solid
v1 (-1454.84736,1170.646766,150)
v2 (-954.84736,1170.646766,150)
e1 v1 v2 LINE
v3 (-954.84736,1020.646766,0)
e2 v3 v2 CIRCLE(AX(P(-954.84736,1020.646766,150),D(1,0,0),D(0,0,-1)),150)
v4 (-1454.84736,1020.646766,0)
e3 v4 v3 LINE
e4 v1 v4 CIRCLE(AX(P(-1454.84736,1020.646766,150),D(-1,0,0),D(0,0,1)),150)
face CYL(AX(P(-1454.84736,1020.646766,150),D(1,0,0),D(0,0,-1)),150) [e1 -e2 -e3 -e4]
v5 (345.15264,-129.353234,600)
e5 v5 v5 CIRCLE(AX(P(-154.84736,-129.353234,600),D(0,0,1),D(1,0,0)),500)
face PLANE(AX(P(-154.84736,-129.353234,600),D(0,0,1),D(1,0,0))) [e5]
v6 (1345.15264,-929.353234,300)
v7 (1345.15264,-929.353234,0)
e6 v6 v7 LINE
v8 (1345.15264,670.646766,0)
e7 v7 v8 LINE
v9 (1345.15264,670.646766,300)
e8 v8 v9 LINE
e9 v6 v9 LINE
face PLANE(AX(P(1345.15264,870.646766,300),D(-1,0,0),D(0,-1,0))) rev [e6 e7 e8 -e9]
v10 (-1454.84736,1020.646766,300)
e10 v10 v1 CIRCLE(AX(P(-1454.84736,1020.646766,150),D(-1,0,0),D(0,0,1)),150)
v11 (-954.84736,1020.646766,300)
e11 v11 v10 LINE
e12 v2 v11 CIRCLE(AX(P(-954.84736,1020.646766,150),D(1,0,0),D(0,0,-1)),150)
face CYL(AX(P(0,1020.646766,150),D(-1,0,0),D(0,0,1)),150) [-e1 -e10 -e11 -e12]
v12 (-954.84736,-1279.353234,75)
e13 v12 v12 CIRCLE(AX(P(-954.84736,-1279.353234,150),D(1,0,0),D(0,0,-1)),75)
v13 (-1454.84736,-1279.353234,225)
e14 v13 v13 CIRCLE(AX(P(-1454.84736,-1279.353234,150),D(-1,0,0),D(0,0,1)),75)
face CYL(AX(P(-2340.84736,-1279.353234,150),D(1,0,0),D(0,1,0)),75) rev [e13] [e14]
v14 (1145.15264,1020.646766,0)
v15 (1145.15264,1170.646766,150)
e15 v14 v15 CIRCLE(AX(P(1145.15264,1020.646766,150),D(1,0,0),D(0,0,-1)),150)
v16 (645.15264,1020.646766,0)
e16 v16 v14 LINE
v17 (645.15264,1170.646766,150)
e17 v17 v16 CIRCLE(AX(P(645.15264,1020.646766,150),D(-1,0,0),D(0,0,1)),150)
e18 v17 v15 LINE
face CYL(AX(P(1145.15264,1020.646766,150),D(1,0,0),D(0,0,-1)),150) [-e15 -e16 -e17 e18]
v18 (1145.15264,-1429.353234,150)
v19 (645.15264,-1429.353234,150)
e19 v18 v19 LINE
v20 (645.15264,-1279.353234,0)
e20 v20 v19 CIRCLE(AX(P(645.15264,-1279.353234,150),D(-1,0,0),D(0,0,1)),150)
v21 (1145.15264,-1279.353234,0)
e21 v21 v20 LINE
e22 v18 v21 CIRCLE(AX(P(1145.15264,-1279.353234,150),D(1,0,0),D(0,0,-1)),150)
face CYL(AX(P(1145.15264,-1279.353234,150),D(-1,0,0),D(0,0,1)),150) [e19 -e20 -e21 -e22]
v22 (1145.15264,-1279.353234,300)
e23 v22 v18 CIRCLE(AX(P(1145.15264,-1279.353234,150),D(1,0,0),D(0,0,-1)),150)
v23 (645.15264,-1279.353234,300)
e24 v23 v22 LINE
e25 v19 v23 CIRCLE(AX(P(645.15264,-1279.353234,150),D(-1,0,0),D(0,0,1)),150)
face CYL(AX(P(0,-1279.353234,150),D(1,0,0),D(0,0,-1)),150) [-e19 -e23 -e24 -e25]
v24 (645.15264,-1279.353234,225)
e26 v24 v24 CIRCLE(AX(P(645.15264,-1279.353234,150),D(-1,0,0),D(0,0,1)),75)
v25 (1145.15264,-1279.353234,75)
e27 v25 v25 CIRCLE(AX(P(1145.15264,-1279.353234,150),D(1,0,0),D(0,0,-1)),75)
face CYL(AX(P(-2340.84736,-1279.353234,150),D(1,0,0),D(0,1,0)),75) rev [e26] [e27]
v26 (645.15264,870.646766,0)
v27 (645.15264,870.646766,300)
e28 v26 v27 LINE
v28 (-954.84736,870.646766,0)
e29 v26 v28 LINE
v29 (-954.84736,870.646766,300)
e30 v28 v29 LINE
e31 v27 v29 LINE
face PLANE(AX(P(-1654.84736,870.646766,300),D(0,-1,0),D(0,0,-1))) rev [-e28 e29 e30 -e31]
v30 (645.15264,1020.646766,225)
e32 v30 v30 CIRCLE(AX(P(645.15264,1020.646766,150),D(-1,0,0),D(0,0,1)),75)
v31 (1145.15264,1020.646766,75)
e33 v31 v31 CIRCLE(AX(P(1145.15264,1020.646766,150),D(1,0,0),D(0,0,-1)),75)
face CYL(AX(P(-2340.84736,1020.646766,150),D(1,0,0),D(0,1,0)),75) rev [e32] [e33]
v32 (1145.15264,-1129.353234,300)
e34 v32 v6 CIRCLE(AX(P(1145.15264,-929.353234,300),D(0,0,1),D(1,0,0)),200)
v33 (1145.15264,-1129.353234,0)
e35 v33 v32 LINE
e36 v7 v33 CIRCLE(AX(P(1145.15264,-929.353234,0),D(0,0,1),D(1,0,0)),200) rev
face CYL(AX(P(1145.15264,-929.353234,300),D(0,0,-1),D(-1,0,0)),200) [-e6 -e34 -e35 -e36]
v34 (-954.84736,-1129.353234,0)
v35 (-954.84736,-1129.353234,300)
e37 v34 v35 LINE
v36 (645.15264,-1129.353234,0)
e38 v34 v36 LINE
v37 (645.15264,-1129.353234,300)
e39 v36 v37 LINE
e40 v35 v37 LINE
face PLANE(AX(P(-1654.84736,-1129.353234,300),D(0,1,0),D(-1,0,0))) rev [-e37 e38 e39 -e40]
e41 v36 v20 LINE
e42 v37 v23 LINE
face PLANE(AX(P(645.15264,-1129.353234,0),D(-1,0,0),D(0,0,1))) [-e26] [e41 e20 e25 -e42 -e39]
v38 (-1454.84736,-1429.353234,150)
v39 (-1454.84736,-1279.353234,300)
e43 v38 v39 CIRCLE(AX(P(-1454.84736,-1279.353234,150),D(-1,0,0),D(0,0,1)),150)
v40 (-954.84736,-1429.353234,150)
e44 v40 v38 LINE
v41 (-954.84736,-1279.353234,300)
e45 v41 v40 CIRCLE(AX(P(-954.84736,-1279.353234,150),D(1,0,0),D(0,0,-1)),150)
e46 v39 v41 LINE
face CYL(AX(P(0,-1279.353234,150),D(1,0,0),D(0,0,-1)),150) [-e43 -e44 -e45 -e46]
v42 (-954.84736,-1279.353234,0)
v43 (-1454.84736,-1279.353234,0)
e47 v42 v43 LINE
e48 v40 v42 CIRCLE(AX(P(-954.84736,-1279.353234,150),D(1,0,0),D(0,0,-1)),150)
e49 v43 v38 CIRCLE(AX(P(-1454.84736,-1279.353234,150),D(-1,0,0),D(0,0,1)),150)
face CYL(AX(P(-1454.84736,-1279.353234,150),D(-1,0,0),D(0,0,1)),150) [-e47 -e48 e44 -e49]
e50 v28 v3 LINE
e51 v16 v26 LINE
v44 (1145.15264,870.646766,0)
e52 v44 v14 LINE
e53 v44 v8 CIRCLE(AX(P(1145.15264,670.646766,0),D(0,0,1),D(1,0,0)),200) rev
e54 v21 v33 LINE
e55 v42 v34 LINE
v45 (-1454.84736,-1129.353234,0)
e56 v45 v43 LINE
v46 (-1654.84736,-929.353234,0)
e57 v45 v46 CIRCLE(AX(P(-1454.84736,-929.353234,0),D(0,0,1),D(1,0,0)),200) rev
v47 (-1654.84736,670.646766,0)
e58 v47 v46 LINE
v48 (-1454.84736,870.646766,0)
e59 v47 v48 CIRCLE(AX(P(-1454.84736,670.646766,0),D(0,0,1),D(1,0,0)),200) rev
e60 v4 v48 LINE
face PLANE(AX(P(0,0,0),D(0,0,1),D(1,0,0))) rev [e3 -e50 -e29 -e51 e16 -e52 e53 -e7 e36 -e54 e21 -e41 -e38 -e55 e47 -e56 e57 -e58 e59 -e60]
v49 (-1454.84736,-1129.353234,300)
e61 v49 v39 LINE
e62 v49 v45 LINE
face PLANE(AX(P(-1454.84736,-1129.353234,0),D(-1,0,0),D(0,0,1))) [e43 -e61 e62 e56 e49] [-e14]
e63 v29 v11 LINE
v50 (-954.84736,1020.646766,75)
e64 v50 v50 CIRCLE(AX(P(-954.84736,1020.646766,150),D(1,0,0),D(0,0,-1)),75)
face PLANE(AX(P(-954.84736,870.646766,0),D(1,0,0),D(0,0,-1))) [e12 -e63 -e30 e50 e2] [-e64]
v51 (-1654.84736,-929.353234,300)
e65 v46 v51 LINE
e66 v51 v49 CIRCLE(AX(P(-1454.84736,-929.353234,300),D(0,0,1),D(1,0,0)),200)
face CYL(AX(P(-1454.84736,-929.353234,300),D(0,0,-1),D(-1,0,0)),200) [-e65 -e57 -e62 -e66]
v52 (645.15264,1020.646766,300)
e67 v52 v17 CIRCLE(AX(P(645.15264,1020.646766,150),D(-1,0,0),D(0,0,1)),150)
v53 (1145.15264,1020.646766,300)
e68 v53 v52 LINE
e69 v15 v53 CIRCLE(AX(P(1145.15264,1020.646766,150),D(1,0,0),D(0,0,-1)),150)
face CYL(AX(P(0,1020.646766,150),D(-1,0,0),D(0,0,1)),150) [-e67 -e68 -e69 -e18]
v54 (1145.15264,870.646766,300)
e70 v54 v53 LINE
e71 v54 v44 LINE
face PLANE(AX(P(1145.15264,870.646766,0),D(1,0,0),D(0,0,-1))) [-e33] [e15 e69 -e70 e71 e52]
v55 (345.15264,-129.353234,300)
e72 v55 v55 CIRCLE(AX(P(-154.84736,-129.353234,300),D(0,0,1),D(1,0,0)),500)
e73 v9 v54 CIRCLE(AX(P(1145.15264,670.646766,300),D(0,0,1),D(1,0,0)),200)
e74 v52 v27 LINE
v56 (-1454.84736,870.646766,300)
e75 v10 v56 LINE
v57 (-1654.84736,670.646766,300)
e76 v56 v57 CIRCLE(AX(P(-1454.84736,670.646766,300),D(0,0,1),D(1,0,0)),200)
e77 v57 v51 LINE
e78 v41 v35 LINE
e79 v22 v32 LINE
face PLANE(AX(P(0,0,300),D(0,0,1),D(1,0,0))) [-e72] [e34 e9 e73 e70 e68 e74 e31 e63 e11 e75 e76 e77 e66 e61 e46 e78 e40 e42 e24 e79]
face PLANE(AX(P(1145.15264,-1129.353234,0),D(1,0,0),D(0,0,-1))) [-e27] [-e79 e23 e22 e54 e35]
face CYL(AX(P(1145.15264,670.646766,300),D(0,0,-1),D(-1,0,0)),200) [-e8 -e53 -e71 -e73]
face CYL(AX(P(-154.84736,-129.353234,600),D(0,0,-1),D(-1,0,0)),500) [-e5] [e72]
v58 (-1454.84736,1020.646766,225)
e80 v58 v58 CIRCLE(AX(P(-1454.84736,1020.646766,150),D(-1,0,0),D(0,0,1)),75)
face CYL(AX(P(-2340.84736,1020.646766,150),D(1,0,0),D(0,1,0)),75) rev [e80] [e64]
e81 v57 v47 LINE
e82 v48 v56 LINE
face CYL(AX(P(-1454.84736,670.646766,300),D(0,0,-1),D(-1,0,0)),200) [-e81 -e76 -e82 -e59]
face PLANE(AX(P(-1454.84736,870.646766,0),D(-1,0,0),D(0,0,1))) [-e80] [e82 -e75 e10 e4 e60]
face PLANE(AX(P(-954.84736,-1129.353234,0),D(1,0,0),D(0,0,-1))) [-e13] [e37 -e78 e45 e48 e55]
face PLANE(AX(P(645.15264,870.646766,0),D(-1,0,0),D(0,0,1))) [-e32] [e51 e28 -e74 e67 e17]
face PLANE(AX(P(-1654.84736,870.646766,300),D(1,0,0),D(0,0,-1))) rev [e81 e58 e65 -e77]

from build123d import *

# Parameters (mm, degrees)
IZIM1_W                     = 3000
IZIM1_H                     = 2000
Y_KSEKLIK_EKSTR_ZYON1_DEPTH = 300
RADYUS1_R                   = 200
IZIM2_W                     = 500
IZIM2_H                     = 300
Y_KSEKLIK_EKSTR_ZYON2_DEPTH = 300
IZIM3_R                     = 75
KES_EKSTR_ZYON1_DEPTH       = 3686
RADYUS2_R                   = 150
IZIM4_R                     = 500
Y_KSEKLIK_EKSTR_ZYON3_DEPTH = 300


with BuildPart() as part:
    # Çizim1 → Yükseklik-Ekstrüzyon1 (new body)
    with BuildSketch(Plane.XY):
        with Locations((-154.847360295, -129.353233831)):
            Rectangle(IZIM1_W, IZIM1_H)
    extrude(amount=Y_KSEKLIK_EKSTR_ZYON1_DEPTH)

    # Radyus1
    radyus1_edges = [part.edges().sort_by_distance(p)[0] for p in [
        (-1654.847360295, 870.646766169, 150),
        (1345.152639705, 870.646766169, 150),
        (1345.152639705, -1129.353233831, 150),
        (-1654.847360295, -1129.353233831, 150),
    ]]
    fillet(radyus1_edges, radius=RADYUS1_R)

    # Çizim2 → Yükseklik-Ekstrüzyon2 (add)
    with BuildSketch(Plane.XY.offset(300)):
        with Locations((-1204.847360295, 1020.646766169)):
            Rectangle(IZIM2_W, IZIM2_H)
        with Locations((895.152639705, 1020.646766169)):
            Rectangle(IZIM2_W, IZIM2_H)
        with Locations((895.152639705, -1279.353233831)):
            Rectangle(IZIM2_W, IZIM2_H)
        with Locations((-1204.847360295, -1279.353233831)):
            Rectangle(IZIM2_W, IZIM2_H)
    extrude(amount=-Y_KSEKLIK_EKSTR_ZYON2_DEPTH)

    # Çizim3 → Kes-Ekstrüzyon1 (cut)
    with BuildSketch(Plane(origin=(1345.152639705, 0, 0), x_dir=(0, 0, -1), z_dir=(1, 0, 0))):
        with Locations(Location((-150, 1020.646766169, 0), (0, 0, 180))):
            Circle(IZIM3_R)
        with Locations((-150, -1279.353233831)):
            Circle(IZIM3_R)
    extrude(amount=-KES_EKSTR_ZYON1_DEPTH, mode=Mode.SUBTRACT)

    # Radyus2
    radyus2_edges = [part.edges().sort_by_distance(p)[0] for p in [
        (-1204.847360295, -1429.353233831, 300),
        (-1204.847360295, -1429.353233831, 0),
        (895.152639705, -1429.353233831, 300),
        (895.152639705, -1429.353233831, 0),
        (895.152639705, 1170.646766169, 300),
        (895.152639705, 1170.646766169, 0),
        (-1204.847360295, 1170.646766169, 300),
        (-1204.847360295, 1170.646766169, 0),
    ]]
    fillet(radyus2_edges, radius=RADYUS2_R - 0.0001)  # a hair under: the kernel refuses the full size

    # Çizim4 → Yükseklik-Ekstrüzyon3 (add)
    with BuildSketch(Plane.XY.offset(300)):
        with Locations((-154.847360295, -129.353233831)):
            Circle(IZIM4_R)
    extrude(amount=Y_KSEKLIK_EKSTR_ZYON3_DEPTH)


solid = part.part
